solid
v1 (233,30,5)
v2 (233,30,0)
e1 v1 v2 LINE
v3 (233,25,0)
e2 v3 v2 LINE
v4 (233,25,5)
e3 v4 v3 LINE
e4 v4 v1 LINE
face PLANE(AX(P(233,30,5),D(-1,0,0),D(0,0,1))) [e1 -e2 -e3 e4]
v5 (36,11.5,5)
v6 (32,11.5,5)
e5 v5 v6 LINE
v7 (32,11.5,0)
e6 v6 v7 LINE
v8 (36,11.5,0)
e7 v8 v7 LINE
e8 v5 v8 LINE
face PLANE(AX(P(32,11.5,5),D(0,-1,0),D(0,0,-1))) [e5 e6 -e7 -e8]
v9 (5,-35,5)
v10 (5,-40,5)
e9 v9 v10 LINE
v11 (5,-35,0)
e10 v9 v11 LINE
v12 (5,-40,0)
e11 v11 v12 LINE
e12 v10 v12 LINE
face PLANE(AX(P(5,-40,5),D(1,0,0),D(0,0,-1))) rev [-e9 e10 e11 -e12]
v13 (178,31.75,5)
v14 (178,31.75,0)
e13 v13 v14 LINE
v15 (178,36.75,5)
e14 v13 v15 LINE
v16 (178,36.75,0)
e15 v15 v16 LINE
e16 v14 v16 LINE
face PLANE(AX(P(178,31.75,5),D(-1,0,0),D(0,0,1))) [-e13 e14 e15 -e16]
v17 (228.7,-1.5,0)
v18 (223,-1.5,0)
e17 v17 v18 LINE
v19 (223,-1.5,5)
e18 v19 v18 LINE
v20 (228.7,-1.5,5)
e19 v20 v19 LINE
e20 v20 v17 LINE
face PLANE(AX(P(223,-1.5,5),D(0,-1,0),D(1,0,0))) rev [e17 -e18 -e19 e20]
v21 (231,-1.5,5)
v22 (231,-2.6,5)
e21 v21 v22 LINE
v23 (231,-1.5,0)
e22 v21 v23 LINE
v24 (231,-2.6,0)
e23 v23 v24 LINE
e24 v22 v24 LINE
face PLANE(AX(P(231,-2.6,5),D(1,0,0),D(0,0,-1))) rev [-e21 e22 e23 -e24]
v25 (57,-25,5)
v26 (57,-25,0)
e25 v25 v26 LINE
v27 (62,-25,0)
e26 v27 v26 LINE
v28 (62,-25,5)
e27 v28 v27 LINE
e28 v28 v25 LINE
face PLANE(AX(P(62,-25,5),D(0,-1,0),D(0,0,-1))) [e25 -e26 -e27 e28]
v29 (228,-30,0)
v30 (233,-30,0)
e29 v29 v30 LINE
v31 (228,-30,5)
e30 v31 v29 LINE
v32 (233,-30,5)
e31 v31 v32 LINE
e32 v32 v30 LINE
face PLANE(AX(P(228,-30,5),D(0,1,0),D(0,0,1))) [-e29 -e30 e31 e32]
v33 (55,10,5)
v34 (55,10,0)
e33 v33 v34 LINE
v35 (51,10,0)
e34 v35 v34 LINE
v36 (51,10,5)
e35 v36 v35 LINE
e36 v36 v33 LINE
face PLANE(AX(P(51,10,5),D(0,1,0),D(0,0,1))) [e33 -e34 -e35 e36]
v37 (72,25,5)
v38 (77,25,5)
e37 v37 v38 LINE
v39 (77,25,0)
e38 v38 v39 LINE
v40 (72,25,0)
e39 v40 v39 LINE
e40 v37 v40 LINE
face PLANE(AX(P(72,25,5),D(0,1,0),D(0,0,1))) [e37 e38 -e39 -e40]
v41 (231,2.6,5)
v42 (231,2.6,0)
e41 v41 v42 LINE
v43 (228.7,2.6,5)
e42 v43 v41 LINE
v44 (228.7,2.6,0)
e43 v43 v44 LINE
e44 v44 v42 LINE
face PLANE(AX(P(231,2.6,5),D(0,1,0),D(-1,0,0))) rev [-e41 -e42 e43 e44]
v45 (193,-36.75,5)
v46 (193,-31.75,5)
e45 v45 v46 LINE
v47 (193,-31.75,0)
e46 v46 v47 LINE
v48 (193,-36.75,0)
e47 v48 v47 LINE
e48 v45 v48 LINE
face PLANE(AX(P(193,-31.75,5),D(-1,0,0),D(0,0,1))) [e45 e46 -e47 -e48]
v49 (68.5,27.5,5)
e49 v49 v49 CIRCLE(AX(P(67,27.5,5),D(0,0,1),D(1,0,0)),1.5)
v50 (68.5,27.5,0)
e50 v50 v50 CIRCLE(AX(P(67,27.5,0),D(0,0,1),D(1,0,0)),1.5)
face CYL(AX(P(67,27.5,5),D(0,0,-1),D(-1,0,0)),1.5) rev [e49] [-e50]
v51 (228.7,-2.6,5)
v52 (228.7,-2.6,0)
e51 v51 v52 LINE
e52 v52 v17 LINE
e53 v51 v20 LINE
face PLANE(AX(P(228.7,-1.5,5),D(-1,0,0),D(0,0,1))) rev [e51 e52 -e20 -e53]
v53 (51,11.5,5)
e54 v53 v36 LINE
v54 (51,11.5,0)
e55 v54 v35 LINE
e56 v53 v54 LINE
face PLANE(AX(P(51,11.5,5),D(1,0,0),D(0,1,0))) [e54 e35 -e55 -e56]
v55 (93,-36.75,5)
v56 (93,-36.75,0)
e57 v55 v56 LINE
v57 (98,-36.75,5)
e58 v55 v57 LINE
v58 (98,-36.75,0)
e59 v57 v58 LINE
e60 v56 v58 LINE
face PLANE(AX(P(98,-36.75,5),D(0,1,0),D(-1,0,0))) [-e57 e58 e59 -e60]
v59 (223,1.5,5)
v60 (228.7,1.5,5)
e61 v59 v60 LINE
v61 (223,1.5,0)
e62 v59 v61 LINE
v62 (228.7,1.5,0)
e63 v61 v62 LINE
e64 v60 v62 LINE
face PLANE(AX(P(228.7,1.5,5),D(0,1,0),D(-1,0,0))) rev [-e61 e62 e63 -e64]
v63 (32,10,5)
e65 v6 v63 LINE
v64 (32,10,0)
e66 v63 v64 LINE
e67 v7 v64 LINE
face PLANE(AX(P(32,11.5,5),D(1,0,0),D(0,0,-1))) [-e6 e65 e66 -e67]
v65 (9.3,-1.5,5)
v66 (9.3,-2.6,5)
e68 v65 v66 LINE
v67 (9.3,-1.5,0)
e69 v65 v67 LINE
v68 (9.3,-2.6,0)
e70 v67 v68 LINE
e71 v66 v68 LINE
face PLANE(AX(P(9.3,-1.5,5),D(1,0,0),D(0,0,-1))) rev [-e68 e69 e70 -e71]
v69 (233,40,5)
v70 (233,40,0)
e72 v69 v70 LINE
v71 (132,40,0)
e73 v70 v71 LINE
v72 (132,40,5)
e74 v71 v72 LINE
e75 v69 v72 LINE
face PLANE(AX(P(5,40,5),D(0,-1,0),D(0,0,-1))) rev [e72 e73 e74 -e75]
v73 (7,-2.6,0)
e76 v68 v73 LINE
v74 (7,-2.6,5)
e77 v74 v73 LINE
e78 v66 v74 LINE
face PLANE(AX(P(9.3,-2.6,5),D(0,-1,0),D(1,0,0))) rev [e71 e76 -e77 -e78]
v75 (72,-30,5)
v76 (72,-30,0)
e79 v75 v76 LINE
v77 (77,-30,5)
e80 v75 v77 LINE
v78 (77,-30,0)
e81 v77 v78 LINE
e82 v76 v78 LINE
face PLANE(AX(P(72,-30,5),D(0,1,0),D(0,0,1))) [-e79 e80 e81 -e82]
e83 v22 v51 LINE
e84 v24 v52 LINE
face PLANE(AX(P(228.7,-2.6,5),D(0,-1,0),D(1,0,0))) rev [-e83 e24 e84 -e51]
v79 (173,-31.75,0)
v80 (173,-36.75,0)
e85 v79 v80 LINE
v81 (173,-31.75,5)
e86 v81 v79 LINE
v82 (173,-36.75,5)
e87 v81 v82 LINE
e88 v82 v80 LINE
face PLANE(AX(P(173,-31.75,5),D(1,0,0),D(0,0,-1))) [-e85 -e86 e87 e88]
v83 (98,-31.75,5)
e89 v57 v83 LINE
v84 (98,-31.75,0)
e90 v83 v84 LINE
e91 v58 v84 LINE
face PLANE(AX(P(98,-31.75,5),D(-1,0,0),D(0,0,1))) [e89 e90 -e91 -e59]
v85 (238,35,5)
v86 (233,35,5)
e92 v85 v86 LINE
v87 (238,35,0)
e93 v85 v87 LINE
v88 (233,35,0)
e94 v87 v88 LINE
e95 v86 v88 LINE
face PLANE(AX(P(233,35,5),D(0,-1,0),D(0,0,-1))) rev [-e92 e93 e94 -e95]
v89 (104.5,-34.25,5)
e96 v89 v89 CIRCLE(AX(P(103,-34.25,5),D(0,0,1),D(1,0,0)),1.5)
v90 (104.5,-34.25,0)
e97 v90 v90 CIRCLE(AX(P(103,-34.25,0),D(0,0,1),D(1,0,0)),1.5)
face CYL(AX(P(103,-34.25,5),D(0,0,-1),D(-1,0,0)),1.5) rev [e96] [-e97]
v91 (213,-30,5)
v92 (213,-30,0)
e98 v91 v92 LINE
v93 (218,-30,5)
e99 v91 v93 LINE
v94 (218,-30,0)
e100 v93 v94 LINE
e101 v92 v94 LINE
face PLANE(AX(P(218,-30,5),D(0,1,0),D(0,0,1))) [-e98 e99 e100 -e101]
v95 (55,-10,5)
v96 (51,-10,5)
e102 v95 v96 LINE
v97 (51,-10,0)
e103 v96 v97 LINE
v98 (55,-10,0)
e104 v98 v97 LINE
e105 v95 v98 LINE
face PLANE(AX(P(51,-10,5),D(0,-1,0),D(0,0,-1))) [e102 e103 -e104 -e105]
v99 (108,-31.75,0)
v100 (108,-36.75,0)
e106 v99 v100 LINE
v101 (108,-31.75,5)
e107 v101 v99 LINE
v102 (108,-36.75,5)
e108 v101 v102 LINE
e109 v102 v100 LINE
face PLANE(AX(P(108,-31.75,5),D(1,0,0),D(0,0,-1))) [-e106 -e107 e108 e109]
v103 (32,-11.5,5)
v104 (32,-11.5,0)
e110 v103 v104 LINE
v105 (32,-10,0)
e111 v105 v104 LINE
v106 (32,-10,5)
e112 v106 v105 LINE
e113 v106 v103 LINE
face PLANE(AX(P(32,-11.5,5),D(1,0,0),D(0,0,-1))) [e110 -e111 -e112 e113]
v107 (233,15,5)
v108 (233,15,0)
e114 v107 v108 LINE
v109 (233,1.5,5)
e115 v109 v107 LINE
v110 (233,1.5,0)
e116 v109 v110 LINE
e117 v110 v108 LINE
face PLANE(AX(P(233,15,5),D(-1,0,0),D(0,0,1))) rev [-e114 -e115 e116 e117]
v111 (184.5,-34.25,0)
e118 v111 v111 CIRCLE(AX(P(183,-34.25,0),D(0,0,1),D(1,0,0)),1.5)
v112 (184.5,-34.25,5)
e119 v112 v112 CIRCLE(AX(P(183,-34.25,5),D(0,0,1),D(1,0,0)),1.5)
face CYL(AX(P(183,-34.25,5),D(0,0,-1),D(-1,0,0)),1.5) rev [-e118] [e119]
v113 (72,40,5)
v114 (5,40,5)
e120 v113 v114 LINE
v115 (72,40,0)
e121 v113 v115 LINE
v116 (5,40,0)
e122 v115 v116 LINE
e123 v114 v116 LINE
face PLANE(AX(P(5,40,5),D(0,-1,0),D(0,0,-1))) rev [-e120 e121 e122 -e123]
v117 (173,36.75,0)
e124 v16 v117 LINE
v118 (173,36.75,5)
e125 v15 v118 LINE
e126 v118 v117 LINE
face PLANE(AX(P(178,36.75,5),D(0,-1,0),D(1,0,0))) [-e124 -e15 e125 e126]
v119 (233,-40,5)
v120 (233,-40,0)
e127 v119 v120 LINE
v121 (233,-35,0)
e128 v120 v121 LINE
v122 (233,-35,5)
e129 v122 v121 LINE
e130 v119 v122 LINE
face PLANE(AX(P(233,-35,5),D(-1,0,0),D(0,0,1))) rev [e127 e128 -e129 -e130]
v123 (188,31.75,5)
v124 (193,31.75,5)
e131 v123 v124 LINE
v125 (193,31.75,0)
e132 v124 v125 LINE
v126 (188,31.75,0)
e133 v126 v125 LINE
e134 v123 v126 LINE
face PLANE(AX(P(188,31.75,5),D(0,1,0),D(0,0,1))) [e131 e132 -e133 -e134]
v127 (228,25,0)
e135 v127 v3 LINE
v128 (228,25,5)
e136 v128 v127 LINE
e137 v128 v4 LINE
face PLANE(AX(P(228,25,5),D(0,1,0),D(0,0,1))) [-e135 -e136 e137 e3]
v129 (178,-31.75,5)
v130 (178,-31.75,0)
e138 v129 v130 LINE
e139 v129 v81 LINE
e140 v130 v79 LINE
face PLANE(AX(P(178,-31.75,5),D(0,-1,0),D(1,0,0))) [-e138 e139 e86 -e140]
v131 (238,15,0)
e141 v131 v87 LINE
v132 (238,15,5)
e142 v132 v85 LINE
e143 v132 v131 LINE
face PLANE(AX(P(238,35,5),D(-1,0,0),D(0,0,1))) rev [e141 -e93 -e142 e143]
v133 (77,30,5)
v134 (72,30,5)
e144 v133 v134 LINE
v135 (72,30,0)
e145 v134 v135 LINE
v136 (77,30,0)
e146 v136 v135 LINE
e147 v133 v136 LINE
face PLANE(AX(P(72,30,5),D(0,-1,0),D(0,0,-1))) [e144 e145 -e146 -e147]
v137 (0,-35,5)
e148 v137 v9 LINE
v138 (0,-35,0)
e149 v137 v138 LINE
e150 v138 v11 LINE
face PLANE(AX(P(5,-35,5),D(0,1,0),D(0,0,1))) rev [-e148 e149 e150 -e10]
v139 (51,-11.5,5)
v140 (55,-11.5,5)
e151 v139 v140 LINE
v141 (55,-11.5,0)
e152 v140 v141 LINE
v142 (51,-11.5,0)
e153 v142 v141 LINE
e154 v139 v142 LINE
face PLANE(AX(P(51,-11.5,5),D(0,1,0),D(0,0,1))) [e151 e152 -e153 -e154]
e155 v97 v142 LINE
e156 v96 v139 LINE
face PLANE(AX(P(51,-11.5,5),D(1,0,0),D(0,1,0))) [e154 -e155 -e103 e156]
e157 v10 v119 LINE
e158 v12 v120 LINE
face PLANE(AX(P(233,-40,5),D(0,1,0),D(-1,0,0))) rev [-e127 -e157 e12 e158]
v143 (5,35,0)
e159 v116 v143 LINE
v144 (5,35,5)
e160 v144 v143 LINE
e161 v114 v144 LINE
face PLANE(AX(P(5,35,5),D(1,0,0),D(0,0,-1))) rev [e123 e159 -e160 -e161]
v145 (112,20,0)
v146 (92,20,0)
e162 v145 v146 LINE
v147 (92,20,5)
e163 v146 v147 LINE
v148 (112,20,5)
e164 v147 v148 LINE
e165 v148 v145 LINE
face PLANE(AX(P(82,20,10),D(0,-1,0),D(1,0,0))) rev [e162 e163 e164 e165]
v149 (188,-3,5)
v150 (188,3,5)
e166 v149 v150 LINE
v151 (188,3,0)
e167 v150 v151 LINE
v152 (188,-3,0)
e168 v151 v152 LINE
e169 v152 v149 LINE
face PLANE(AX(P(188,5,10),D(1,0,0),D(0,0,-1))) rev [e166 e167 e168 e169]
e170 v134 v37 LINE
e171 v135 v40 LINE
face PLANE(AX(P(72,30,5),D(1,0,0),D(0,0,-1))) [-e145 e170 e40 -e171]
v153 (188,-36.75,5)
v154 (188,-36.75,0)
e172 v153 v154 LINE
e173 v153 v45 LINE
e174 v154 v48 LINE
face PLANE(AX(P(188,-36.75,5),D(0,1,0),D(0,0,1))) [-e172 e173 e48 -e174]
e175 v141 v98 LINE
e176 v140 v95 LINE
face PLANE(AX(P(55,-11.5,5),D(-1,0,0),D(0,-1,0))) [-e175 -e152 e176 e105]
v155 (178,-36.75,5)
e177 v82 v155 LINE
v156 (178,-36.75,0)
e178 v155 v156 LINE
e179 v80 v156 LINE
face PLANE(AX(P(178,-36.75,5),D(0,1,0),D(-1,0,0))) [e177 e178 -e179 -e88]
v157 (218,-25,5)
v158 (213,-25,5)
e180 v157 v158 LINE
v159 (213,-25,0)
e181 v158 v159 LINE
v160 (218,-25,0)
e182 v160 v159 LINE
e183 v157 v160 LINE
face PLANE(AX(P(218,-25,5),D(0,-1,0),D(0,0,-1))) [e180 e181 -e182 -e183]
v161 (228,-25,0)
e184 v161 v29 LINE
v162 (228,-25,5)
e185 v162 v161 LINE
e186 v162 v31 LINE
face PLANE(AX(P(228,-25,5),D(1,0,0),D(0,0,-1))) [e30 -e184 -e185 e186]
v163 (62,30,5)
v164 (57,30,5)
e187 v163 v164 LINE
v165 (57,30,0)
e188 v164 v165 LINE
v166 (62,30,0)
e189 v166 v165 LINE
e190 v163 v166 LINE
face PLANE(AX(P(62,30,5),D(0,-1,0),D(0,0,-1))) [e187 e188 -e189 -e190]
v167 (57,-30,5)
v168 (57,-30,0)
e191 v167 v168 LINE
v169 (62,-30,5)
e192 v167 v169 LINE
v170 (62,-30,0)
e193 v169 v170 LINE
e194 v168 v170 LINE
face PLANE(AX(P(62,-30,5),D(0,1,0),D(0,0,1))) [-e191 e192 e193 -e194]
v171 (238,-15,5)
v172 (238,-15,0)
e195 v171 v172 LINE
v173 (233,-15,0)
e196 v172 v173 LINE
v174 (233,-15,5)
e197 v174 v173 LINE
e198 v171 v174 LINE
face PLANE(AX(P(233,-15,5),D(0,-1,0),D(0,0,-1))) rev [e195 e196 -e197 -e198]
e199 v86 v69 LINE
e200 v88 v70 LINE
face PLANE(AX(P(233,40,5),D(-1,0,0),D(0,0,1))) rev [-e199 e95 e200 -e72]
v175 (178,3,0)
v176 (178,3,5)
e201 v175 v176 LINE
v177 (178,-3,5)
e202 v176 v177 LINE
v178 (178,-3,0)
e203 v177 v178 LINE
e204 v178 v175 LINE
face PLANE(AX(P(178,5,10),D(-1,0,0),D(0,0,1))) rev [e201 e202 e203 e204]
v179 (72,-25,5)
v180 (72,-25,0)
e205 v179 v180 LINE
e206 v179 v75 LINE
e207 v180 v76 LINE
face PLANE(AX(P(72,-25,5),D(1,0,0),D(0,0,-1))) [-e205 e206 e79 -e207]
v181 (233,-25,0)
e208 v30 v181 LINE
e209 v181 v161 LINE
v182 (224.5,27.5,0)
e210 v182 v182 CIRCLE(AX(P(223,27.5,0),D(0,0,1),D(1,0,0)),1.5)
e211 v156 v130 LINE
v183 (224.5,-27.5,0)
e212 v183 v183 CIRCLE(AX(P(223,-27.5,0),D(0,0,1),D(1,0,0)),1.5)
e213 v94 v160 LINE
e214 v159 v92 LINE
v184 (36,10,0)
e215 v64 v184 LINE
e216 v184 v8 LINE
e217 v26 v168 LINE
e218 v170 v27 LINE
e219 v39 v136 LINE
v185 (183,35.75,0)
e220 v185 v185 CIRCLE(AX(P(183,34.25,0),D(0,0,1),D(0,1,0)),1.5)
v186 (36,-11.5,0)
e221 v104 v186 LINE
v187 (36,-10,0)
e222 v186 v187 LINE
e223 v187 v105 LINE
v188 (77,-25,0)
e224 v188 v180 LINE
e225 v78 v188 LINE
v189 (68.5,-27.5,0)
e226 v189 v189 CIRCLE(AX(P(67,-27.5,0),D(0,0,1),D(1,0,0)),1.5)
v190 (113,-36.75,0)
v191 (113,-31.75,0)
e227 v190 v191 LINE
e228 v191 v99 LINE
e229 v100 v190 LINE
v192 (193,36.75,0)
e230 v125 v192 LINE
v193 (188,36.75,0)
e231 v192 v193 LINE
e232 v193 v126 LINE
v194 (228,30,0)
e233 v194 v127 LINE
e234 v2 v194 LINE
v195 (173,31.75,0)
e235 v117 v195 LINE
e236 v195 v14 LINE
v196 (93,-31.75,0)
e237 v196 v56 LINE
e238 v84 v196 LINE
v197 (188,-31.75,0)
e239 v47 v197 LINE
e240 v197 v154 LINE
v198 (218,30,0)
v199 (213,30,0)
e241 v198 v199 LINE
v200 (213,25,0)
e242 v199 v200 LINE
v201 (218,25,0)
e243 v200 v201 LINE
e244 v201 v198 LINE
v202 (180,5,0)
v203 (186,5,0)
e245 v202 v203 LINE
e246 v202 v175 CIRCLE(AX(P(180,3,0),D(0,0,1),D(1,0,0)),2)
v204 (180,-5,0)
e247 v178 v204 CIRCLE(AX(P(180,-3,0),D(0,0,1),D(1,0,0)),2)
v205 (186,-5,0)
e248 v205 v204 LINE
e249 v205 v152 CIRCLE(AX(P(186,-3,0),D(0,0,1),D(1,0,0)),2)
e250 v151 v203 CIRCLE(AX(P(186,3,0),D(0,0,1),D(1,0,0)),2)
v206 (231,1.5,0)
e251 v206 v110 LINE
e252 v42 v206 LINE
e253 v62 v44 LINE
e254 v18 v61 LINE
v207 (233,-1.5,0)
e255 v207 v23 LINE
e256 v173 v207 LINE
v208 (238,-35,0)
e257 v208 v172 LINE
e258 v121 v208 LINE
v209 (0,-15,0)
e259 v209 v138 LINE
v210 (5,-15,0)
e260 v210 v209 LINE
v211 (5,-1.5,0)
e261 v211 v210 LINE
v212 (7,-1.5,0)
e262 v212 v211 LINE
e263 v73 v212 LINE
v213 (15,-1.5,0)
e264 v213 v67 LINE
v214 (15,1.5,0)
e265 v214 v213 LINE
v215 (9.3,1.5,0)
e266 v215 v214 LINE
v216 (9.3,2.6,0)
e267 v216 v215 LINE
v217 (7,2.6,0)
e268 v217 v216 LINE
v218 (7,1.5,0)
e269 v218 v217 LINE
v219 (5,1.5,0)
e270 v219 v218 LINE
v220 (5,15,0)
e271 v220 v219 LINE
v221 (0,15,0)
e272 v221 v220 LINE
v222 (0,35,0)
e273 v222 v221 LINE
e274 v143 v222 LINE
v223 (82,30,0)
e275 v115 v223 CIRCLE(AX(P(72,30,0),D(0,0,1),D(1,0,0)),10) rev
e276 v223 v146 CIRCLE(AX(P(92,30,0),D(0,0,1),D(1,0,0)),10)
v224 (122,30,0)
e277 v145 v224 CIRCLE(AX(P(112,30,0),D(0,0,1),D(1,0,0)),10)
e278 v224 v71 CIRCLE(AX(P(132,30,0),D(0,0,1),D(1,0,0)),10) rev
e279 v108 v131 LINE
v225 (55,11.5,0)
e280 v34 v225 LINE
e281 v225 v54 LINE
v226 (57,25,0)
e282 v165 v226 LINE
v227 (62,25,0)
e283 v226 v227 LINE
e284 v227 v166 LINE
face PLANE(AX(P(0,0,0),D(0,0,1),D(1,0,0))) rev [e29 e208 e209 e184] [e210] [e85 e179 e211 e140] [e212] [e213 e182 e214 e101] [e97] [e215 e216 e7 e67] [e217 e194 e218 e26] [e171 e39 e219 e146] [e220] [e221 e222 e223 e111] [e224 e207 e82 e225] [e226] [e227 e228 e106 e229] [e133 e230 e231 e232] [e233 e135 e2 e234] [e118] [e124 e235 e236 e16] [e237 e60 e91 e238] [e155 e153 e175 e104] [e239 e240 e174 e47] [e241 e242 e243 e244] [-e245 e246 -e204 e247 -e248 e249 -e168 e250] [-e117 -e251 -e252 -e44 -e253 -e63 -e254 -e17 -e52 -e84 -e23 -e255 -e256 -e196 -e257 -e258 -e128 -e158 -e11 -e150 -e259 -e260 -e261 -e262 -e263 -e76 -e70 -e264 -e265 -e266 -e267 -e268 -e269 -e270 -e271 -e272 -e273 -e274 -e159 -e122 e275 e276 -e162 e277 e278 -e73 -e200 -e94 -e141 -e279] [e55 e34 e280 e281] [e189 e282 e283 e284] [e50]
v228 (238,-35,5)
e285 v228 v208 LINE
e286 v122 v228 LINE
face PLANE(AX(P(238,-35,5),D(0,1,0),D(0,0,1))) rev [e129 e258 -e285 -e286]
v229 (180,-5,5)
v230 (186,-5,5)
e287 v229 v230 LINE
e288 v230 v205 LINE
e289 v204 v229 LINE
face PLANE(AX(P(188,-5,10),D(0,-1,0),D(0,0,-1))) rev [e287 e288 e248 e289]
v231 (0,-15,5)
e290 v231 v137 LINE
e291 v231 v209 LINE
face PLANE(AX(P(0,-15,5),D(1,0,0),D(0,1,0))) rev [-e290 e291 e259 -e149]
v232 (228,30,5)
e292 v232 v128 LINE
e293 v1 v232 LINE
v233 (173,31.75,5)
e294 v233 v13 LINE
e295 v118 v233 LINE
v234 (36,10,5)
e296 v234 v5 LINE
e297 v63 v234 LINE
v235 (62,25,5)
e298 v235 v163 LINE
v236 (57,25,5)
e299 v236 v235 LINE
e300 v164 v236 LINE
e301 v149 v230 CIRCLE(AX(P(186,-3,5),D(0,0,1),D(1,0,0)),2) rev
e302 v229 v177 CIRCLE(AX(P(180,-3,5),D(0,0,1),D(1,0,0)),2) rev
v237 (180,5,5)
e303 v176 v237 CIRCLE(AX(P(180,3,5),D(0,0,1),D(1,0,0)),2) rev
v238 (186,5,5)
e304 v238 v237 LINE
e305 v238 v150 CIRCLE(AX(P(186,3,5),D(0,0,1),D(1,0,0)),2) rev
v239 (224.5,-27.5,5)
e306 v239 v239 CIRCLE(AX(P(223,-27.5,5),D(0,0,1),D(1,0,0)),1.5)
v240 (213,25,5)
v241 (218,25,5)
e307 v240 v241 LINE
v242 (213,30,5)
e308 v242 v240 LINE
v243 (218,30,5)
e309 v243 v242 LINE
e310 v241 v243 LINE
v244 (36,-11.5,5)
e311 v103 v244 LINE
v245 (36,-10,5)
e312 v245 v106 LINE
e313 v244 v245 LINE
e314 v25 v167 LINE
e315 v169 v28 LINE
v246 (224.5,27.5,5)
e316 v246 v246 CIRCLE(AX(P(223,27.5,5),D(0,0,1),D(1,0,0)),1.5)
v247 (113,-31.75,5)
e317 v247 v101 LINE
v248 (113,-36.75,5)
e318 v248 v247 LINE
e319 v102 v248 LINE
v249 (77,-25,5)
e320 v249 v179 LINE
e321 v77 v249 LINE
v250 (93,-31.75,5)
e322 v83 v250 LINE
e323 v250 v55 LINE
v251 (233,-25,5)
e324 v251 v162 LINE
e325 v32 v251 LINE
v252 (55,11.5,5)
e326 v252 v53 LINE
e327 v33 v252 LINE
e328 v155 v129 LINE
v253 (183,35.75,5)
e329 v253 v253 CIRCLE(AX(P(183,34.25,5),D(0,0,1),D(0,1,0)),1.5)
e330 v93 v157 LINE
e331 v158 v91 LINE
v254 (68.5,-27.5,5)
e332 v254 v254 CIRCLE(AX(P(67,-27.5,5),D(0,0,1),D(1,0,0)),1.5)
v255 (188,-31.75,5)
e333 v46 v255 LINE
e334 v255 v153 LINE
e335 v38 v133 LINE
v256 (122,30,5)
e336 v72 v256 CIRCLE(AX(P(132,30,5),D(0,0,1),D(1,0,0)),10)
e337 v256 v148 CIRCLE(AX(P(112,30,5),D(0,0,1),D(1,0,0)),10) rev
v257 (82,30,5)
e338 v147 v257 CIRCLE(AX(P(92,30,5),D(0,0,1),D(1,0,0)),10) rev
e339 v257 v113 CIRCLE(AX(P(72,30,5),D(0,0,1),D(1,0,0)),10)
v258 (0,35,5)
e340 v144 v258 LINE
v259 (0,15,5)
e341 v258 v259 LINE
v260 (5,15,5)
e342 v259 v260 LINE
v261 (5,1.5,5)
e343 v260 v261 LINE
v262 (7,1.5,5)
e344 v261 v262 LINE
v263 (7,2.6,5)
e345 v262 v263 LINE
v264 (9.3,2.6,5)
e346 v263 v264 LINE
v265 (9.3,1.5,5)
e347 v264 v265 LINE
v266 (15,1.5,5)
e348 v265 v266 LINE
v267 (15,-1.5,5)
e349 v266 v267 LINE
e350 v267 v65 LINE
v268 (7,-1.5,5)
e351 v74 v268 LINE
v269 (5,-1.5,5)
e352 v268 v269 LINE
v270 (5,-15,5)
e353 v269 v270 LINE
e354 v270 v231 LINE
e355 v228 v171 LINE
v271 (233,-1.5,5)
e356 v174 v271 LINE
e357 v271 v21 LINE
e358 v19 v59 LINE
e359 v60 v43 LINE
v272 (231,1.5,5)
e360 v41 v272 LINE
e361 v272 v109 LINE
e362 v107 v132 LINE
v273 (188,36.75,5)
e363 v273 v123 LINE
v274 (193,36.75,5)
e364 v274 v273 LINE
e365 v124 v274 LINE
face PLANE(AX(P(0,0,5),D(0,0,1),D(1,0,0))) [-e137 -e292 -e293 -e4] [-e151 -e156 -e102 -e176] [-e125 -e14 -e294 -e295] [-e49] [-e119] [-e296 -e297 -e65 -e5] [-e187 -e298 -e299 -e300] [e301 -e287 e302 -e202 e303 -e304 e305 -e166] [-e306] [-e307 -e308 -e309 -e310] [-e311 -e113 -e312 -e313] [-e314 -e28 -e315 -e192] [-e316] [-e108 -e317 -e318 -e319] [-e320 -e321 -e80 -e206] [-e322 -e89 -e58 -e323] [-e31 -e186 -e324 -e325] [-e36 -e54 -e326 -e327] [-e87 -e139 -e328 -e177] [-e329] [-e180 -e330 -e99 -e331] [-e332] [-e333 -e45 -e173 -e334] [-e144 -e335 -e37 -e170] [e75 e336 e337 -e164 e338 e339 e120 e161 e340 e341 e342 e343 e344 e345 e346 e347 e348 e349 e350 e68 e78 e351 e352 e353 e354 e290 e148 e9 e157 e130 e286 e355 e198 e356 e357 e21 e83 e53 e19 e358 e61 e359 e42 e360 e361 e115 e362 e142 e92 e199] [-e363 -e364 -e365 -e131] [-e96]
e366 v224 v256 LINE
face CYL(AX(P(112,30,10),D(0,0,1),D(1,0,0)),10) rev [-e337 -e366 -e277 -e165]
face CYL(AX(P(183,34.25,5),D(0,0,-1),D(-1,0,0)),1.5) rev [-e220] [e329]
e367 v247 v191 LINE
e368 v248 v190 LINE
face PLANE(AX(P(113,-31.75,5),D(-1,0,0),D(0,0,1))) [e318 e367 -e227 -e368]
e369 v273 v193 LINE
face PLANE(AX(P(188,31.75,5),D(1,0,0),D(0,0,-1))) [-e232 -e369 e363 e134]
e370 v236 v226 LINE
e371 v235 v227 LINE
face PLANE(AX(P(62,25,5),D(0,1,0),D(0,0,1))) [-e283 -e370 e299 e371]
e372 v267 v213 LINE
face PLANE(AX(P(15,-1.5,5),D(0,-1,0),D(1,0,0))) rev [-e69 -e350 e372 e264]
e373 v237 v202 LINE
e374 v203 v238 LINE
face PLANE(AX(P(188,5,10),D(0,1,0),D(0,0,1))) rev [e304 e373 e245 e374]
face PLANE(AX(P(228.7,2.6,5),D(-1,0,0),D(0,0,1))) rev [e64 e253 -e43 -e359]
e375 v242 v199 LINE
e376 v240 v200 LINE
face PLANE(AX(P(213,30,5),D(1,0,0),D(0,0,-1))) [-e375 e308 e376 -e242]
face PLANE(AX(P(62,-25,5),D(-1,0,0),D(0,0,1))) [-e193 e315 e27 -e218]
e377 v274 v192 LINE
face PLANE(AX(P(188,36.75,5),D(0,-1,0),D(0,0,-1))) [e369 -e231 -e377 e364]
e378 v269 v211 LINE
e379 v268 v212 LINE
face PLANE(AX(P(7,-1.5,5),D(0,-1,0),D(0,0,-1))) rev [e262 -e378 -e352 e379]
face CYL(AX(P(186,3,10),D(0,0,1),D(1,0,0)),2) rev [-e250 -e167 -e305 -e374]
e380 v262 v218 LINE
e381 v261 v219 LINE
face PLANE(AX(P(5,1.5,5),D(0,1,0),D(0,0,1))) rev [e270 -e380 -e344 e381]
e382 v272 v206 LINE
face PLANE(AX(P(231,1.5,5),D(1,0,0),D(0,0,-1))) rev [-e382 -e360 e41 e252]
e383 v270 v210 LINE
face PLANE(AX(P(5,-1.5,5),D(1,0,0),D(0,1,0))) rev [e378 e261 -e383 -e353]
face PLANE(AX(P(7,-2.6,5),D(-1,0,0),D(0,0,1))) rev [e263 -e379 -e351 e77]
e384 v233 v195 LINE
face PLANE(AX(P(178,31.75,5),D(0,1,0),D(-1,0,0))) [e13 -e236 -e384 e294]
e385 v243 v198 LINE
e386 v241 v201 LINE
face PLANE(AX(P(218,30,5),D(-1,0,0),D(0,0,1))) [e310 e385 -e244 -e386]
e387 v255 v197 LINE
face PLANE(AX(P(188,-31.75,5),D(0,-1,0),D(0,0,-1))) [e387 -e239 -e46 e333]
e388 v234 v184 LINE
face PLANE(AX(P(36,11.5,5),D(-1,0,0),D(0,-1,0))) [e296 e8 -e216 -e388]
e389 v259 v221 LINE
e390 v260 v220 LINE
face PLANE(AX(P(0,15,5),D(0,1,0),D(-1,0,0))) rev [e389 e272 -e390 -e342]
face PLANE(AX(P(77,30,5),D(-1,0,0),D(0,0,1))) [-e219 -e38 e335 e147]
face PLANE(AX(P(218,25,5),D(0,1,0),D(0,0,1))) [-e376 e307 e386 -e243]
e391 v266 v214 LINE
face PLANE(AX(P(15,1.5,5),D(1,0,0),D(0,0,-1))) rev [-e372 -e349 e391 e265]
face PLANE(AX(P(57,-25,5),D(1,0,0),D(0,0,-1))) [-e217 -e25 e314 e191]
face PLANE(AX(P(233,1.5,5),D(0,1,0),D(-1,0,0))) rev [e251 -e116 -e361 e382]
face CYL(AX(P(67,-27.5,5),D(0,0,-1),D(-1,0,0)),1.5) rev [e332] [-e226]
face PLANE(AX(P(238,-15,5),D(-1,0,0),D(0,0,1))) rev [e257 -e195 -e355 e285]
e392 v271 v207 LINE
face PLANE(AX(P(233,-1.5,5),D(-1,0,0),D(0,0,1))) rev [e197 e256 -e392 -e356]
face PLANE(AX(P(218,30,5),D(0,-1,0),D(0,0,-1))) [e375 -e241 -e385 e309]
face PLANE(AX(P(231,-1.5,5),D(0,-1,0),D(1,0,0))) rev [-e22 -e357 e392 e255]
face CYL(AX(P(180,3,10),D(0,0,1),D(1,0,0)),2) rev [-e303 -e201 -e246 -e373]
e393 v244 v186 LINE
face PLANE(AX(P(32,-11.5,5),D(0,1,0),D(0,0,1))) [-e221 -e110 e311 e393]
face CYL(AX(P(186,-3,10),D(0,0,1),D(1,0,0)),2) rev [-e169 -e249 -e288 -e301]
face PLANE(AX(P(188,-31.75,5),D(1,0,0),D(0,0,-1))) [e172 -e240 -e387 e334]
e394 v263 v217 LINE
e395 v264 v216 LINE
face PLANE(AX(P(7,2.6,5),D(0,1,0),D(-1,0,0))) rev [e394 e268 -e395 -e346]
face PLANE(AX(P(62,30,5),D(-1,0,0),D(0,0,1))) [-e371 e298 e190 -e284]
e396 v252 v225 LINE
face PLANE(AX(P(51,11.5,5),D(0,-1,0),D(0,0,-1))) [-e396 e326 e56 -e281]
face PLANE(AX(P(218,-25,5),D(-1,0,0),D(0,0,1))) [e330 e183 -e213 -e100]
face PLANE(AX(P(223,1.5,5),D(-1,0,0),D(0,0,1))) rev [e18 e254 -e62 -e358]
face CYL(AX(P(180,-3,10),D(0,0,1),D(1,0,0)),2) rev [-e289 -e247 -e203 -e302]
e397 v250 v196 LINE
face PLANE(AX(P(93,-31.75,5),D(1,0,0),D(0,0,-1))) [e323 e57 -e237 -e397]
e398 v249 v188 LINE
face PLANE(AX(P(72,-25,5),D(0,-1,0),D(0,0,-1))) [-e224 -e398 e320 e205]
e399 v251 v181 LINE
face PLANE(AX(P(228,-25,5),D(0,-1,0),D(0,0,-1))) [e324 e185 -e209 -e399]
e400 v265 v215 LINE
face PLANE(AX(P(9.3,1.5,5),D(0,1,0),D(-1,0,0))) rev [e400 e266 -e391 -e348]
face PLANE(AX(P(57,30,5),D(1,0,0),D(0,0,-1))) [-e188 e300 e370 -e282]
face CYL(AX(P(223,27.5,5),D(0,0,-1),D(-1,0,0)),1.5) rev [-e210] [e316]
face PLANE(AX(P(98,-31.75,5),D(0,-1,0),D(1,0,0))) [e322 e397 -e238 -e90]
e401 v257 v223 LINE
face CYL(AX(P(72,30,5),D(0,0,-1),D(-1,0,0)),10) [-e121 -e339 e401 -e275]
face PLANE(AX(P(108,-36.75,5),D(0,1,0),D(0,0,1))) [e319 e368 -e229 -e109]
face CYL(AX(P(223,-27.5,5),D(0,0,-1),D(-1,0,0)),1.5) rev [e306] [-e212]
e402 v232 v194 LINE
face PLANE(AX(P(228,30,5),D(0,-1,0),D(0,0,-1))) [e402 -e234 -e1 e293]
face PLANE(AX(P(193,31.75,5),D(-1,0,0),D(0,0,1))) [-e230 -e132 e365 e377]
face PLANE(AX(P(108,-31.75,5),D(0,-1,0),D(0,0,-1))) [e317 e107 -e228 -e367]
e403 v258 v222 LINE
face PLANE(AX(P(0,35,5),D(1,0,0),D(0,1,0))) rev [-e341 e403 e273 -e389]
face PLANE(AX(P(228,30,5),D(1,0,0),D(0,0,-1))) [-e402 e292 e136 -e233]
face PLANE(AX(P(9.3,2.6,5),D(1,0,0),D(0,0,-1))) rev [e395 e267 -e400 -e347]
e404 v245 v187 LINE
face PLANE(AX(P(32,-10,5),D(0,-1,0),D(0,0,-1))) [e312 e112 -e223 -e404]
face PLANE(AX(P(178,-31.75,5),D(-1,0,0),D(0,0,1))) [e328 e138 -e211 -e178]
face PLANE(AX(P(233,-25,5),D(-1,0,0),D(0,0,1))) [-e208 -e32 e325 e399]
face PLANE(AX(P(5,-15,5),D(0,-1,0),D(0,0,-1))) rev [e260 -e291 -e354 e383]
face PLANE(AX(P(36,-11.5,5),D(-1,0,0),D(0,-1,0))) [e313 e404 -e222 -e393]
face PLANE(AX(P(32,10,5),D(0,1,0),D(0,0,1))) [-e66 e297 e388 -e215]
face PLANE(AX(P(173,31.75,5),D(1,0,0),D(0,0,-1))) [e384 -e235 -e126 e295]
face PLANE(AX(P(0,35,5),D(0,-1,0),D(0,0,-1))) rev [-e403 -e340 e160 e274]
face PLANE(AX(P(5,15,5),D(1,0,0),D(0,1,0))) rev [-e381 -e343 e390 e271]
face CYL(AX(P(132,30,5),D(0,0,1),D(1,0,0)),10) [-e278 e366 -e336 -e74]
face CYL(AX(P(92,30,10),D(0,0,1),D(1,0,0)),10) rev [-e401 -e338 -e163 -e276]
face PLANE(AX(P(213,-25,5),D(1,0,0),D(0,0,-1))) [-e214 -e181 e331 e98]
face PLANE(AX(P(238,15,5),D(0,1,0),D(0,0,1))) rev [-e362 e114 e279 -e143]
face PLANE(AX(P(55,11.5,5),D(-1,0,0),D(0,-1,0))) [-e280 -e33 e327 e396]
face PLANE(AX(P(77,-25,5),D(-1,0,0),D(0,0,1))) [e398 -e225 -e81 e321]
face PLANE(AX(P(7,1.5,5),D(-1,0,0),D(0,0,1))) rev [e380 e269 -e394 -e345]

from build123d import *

# Parameters (mm, degrees)
ESQUISSE1_R        = 1.5
ESQUISSE1_W        = 4
ESQUISSE1_H        = 1.5
ESQUISSE1_W_2      = 5
ESQUISSE1_H_2      = 5
BOSS_EXTRU_1_DEPTH = 5
SKETCH1_W          = 40
SKETCH1_H          = 20
SKETCH1_W_2        = 10
SKETCH1_H_2        = 10
CUT_EXTRUDE1_DEPTH = 10
FILLET2_R          = 10
FILLET3_R          = 2


with BuildPart() as part:
    # Esquisse1 → Boss.-Extru.1 (new body)
    with BuildSketch(Plane.XY):
        Polygon((0, 35), (0, 15), (5, 15), (5, 1.5), (7, 1.5), (7, 2.6), (9.3, 2.6), (9.3, 1.5), (15, 1.5), (15, -1.5), (9.3, -1.5), (9.3, -2.6), (7, -2.6), (7, -1.5), (5, -1.5), (5, -15), (0, -15), (0, -35), (5, -35), (5, -40), (233, -40), (233, -35), (238, -35), (238, -15), (233, -15), (233, -1.5), (231, -1.5), (231, -2.6), (228.7, -2.6), (228.7, -1.5), (223, -1.5), (223, 1.5), (228.7, 1.5), (228.7, 2.6), (231, 2.6), (231, 1.5), (233, 1.5), (233, 15), (238, 15), (238, 35), (233, 35), (233, 40), (5, 40), (5, 35), align=None)
        with Locations((223, 27.5)):
            Circle(ESQUISSE1_R, mode=Mode.SUBTRACT)
        with Locations((223, -27.5)):
            Circle(ESQUISSE1_R, mode=Mode.SUBTRACT)
        with Locations((67, -27.5)):
            Circle(ESQUISSE1_R, mode=Mode.SUBTRACT)
        with Locations((67, 27.5)):
            Circle(ESQUISSE1_R, mode=Mode.SUBTRACT)
        with Locations((183, -34.25)):
            Circle(ESQUISSE1_R, mode=Mode.SUBTRACT)
        with Locations(Location((183, 34.25, 0), (0, 0, 90))):
            Circle(ESQUISSE1_R, mode=Mode.SUBTRACT)
        with Locations(Location((103, 34.25, 0), (0, 0, 90))):
            Circle(ESQUISSE1_R, mode=Mode.SUBTRACT)
        with Locations((103, -34.25)):
            Circle(ESQUISSE1_R, mode=Mode.SUBTRACT)
        with Locations((34, -10.75)):
            Rectangle(ESQUISSE1_W, ESQUISSE1_H, mode=Mode.SUBTRACT)
        with Locations((34, 10.75)):
            Rectangle(ESQUISSE1_W, ESQUISSE1_H, mode=Mode.SUBTRACT)
        with Locations((53, 10.75)):
            Rectangle(ESQUISSE1_W, ESQUISSE1_H, mode=Mode.SUBTRACT)
        with Locations((53, -10.75)):
            Rectangle(ESQUISSE1_W, ESQUISSE1_H, mode=Mode.SUBTRACT)
        with Locations((215.5, 27.5)):
            Rectangle(ESQUISSE1_W_2, ESQUISSE1_H_2, mode=Mode.SUBTRACT)
        with Locations((230.5, 27.5)):
            Rectangle(ESQUISSE1_W_2, ESQUISSE1_H_2, mode=Mode.SUBTRACT)
        with Locations((215.5, -27.5)):
            Rectangle(ESQUISSE1_W_2, ESQUISSE1_H_2, mode=Mode.SUBTRACT)
        with Locations((230.5, -27.5)):
            Rectangle(ESQUISSE1_W_2, ESQUISSE1_H_2, mode=Mode.SUBTRACT)
        with Locations((59.5, -27.5)):
            Rectangle(ESQUISSE1_W_2, ESQUISSE1_H_2, mode=Mode.SUBTRACT)
        with Locations((74.5, -27.5)):
            Rectangle(ESQUISSE1_W_2, ESQUISSE1_H_2, mode=Mode.SUBTRACT)
        with Locations((59.5, 27.5)):
            Rectangle(ESQUISSE1_W_2, ESQUISSE1_H_2, mode=Mode.SUBTRACT)
        with Locations((74.5, 27.5)):
            Rectangle(ESQUISSE1_W_2, ESQUISSE1_H_2, mode=Mode.SUBTRACT)
        with Locations((175.5, -34.25)):
            Rectangle(ESQUISSE1_W_2, ESQUISSE1_H_2, mode=Mode.SUBTRACT)
        with Locations((190.5, -34.25)):
            Rectangle(ESQUISSE1_W_2, ESQUISSE1_H_2, mode=Mode.SUBTRACT)
        with Locations((175.5, 34.25)):
            Rectangle(ESQUISSE1_W_2, ESQUISSE1_H_2, mode=Mode.SUBTRACT)
        with Locations((190.5, 34.25)):
            Rectangle(ESQUISSE1_W_2, ESQUISSE1_H_2, mode=Mode.SUBTRACT)
        with Locations((95.5, 34.25)):
            Rectangle(ESQUISSE1_W_2, ESQUISSE1_H_2, mode=Mode.SUBTRACT)
        with Locations((110.5, 34.25)):
            Rectangle(ESQUISSE1_W_2, ESQUISSE1_H_2, mode=Mode.SUBTRACT)
        with Locations((95.5, -34.25)):
            Rectangle(ESQUISSE1_W_2, ESQUISSE1_H_2, mode=Mode.SUBTRACT)
        with Locations((110.5, -34.25)):
            Rectangle(ESQUISSE1_W_2, ESQUISSE1_H_2, mode=Mode.SUBTRACT)
    extrude(amount=BOSS_EXTRU_1_DEPTH)

    # Sketch1 → Cut-Extrude1 (cut)
    with BuildSketch(Plane(origin=(0, 0, 0), x_dir=(-1, 0, 0), z_dir=(0, 0, -1))):
        with Locations((-102, 30)):
            Rectangle(SKETCH1_W, SKETCH1_H)
        with Locations((-183, 0)):
            Rectangle(SKETCH1_W_2, SKETCH1_H_2)
    extrude(amount=-CUT_EXTRUDE1_DEPTH, mode=Mode.SUBTRACT)

    # Fillet2
    fillet2_edges = [part.edges().sort_by_distance(p)[0] for p in [
        (122, 20, 2.5),
        (82, 20, 2.5),
    ]]
    fillet(fillet2_edges, radius=FILLET2_R)
    fillet2_2_edges = [part.edges().sort_by_distance(p)[0] for p in [
        (122, 40, 2.5),
        (82, 40, 2.5),
    ]]
    fillet(fillet2_2_edges, radius=FILLET2_R - 0.0001)  # a hair under: the kernel refuses the full size

    # Fillet3
    fillet3_edges = [part.edges().sort_by_distance(p)[0] for p in [
        (188, -5, 2.5),
        (188, 5, 2.5),
        (178, 5, 2.5),
        (178, -5, 2.5),
    ]]
    fillet(fillet3_edges, radius=FILLET3_R)


solid = part.part
